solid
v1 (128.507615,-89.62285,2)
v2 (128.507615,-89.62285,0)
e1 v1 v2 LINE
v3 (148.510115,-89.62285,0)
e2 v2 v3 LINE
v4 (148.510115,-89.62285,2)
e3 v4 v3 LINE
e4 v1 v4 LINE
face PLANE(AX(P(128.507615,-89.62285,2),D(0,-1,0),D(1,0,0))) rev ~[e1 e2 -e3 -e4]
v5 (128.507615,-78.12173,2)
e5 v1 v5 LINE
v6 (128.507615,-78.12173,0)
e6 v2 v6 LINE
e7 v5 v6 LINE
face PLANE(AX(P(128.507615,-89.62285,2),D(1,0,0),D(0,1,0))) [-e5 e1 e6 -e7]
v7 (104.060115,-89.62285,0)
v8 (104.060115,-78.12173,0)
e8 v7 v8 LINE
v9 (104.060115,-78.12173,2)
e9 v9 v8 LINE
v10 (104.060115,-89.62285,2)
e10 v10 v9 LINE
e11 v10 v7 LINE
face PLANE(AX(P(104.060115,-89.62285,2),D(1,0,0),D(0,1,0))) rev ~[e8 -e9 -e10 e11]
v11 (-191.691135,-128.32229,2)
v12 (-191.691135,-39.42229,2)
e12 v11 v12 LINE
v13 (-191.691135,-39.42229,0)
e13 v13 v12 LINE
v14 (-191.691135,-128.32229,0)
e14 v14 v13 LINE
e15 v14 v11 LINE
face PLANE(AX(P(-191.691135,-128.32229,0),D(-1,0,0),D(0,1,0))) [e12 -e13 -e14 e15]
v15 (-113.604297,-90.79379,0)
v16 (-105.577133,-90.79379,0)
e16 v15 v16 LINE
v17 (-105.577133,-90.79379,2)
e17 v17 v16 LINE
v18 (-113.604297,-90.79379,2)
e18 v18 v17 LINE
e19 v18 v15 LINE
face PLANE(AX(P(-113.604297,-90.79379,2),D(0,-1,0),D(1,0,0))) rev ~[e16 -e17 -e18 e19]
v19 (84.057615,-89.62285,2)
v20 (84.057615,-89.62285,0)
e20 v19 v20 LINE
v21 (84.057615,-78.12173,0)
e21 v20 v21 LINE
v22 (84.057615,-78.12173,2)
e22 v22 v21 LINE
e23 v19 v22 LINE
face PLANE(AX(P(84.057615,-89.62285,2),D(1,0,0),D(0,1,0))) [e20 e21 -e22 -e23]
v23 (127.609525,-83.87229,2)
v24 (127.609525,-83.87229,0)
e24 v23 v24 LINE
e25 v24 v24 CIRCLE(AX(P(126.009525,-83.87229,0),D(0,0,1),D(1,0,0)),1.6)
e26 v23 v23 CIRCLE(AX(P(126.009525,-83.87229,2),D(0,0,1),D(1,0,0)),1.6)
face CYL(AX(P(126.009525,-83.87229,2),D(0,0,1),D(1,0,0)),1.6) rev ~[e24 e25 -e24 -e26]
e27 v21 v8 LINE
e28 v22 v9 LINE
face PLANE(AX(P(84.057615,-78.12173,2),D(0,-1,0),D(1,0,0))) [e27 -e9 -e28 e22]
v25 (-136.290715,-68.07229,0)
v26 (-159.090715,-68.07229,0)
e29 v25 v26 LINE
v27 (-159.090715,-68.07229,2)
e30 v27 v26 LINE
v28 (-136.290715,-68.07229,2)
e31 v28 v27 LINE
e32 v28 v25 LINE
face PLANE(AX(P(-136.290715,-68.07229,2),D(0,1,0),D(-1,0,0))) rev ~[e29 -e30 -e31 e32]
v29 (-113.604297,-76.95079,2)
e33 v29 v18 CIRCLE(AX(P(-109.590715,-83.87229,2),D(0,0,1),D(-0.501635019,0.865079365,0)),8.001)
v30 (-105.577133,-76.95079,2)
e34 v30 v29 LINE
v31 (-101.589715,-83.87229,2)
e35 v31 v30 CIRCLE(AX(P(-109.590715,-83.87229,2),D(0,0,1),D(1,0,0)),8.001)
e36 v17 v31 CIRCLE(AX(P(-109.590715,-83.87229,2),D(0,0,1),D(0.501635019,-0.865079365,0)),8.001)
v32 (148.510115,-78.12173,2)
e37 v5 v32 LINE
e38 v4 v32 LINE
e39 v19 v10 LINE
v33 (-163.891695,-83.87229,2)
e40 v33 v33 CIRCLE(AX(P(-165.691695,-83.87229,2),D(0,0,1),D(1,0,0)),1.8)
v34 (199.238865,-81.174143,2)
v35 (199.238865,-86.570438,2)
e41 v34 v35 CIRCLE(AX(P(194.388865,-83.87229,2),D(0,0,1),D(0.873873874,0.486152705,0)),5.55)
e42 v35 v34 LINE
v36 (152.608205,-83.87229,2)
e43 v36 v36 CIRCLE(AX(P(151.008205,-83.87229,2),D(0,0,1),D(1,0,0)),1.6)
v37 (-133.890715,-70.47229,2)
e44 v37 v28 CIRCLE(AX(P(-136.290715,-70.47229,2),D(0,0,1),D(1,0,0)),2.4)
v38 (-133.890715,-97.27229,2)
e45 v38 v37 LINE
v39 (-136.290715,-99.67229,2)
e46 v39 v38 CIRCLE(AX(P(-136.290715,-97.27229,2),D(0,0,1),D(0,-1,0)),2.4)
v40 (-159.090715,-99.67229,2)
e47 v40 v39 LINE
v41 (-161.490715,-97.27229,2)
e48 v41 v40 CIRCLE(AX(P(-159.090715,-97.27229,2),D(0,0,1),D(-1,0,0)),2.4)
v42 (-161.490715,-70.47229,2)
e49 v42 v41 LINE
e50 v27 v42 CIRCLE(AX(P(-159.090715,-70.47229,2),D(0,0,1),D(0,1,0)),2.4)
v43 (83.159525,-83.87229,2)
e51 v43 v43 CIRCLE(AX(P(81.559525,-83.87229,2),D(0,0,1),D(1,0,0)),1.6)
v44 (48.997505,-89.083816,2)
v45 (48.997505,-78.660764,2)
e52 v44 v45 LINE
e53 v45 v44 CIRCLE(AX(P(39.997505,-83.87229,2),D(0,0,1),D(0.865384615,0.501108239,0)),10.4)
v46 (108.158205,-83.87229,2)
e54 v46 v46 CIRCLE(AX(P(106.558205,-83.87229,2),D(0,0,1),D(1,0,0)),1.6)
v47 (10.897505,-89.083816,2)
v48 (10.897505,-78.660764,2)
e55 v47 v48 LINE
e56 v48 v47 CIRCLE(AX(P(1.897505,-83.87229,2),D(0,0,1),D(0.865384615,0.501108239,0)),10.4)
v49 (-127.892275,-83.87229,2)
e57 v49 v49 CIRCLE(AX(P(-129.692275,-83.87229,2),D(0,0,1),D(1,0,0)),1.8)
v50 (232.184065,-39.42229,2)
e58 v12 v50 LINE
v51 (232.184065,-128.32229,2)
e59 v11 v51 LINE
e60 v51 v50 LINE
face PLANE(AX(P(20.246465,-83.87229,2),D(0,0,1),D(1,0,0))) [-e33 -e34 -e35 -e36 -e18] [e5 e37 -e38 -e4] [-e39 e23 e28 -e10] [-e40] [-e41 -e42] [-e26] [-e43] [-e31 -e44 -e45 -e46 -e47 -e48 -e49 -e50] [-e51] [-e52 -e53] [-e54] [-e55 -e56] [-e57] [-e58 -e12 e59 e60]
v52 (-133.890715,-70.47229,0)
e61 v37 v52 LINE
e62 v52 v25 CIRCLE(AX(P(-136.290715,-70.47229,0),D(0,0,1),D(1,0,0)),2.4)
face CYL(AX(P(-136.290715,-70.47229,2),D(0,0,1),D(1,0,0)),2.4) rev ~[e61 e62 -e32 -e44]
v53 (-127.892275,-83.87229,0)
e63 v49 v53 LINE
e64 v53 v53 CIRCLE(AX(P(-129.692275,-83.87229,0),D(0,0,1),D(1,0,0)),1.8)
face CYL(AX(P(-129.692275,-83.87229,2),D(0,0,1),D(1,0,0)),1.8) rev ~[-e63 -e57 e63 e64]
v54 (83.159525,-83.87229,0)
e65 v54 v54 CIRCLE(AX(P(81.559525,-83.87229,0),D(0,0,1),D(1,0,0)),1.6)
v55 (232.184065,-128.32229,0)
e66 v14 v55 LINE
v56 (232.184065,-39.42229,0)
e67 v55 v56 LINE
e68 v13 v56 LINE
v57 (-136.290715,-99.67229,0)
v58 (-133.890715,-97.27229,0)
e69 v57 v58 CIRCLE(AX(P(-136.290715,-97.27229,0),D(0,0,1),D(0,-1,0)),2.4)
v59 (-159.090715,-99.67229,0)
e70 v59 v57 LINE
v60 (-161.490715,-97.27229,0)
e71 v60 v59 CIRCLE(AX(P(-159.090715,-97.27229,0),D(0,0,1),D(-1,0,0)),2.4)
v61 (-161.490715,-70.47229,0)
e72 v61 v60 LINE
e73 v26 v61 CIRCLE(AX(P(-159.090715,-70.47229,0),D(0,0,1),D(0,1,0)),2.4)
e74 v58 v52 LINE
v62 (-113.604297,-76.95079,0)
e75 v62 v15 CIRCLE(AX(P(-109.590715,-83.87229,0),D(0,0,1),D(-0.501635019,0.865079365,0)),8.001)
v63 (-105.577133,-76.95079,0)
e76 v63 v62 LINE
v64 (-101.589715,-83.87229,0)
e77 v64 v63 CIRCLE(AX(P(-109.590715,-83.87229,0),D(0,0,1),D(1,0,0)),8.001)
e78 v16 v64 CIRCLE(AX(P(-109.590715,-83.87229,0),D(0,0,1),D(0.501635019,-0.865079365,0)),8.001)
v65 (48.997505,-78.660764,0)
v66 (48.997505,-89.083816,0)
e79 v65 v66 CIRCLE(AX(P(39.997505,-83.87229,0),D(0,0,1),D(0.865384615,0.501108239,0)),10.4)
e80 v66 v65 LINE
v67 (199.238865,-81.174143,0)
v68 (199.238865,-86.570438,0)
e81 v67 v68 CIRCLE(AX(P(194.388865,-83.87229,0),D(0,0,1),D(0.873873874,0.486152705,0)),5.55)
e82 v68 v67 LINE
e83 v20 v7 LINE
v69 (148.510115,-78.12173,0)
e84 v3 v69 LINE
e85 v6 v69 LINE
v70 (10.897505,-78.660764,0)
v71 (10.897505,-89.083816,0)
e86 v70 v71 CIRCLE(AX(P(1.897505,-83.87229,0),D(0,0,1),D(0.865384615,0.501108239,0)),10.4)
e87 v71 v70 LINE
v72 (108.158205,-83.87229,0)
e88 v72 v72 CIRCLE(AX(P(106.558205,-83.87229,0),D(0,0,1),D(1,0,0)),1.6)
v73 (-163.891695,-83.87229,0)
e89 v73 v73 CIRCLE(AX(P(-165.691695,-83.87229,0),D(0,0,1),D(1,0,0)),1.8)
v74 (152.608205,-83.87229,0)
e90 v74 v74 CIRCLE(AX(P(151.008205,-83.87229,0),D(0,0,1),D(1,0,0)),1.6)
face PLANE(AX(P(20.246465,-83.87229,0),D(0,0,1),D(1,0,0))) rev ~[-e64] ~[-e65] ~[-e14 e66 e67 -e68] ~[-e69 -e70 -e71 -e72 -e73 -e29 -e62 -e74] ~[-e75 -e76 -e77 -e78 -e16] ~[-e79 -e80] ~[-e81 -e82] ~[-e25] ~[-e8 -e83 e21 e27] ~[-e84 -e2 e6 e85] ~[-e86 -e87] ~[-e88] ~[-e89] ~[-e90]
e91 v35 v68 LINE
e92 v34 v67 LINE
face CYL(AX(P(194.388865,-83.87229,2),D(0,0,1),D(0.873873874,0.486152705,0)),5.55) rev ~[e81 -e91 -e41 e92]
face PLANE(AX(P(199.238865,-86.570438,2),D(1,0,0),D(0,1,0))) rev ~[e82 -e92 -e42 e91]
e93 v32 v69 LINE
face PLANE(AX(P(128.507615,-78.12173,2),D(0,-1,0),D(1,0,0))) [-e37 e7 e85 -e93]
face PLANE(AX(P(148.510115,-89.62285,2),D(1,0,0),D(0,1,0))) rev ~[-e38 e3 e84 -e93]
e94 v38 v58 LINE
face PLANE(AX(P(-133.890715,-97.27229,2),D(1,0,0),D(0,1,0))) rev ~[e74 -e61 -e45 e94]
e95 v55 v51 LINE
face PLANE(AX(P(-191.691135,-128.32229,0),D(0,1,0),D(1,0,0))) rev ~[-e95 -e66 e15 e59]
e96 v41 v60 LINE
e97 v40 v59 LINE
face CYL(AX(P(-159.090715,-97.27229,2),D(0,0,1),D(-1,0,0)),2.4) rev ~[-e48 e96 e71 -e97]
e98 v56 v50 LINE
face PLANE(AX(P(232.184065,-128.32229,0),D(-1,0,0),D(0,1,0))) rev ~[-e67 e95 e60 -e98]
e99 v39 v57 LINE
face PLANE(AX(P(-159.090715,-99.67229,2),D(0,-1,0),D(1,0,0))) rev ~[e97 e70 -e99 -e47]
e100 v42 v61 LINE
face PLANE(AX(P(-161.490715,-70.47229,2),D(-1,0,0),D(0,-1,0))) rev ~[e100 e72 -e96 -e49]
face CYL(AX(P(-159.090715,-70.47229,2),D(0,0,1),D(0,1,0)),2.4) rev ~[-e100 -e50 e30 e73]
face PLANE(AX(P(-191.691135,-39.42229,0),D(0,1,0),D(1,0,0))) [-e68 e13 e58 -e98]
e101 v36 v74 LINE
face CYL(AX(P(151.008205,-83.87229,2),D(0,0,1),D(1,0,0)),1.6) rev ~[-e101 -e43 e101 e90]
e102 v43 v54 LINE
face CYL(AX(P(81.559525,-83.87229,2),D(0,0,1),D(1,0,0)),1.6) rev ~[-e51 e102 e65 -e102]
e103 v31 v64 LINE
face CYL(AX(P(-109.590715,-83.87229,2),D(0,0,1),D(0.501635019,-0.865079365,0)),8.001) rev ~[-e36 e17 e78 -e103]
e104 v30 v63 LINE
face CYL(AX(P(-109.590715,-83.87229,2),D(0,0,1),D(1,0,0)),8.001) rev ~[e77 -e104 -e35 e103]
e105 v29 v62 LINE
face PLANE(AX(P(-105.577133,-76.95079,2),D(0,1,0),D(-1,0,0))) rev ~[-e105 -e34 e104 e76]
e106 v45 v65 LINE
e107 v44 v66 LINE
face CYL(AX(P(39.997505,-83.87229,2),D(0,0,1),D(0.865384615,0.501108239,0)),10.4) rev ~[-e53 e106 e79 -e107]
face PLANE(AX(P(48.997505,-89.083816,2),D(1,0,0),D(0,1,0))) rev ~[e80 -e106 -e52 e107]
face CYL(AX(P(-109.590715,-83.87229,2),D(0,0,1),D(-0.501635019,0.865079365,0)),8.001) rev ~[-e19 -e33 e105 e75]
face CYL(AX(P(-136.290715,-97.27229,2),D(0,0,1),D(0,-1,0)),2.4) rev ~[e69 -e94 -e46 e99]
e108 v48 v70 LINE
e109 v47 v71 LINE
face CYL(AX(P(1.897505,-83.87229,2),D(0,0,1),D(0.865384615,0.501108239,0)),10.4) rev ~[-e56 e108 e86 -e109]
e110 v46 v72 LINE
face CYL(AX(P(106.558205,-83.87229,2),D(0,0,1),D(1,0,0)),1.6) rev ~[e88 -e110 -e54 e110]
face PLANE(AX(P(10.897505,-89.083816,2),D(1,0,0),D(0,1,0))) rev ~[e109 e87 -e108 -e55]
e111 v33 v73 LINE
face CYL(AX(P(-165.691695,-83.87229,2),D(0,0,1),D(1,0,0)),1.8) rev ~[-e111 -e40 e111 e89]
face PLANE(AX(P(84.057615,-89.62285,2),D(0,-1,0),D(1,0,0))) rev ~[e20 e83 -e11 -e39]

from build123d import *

# Parameters (mm, degrees)
F0_W     = 423.8752
F0_H     = 88.9
F1_DEPTH = 2
F2_R     = 1.8
F2_W     = 20.0025
F2_H     = 11.50112
F2_R_2   = 1.6
F3_DEPTH = 25.4


# Not quite as in the source:
# - a feature names something its author has since deleted; it is built from what else it names


with BuildPart() as f1:
    # F0 (on Top) → F1 (new body)
    with BuildSketch(Plane.XY):
        with Locations((20.2464647591, -83.8722900312)):
            Rectangle(F0_W, F0_H)
    extrude(amount=F1_DEPTH)

    # F2 (on face) → F3 (cut)
    with BuildSketch(Plane.XY.offset(2)):
        with Locations((-165.6916952409, -83.8722900312)):
            Circle(F2_R)
        with BuildLine():
            Line((-159.0907152409, -99.6722900312), (-136.2907152409, -99.6722900312))
            ThreePointArc((-136.2907152409, -99.6722900312), (-134.593658966, -98.9693463061), (-133.8907152409, -97.2722900312))
            Line((-133.8907152409, -97.2722900312), (-133.8907152409, -70.4722900312))
            ThreePointArc((-133.8907152409, -70.4722900312), (-134.593658966, -68.7752337564), (-136.2907152409, -68.0722900312))
            Line((-136.2907152409, -68.0722900312), (-159.0907152409, -68.0722900312))
            ThreePointArc((-159.0907152409, -68.0722900312), (-160.7877715157, -68.7752337564), (-161.4907152409, -70.4722900312))
            Line((-161.4907152409, -70.4722900312), (-161.4907152409, -97.2722900312))
            ThreePointArc((-161.4907152409, -97.2722900312), (-160.7877715157, -98.9693463061), (-159.0907152409, -99.6722900312))
        make_face()
        with Locations((-129.6922752409, -83.8722900312)):
            Circle(F2_R)
        with BuildLine():
            ThreePointArc((-105.5771334553, -90.7937900312), (-102.6578706275, -87.8662437824), (-101.5897152409, -83.8722900312))
            ThreePointArc((-101.5897152409, -83.8722900312), (-102.6578706275, -79.87833628), (-105.5771334553, -76.9507900312))
            Line((-105.5771334553, -76.9507900312), (-113.6042970265, -76.9507900312))
            ThreePointArc((-113.6042970265, -76.9507900312), (-117.5917152409, -83.8722900312), (-113.6042970265, -90.7937900312))
            Line((-113.6042970265, -90.7937900312), (-105.5771334553, -90.7937900312))
        make_face()
        with BuildLine():
            Line((10.8975047591, -89.0838157195), (10.8975047591, -78.6607643429))
            ThreePointArc((10.8975047591, -78.6607643429), (-8.5024952409, -83.8722900312), (10.8975047591, -89.0838157195))
        make_face()
        with BuildLine():
            Line((48.9975047591, -89.0838157195), (48.9975047591, -78.6607643429))
            ThreePointArc((48.9975047591, -78.6607643429), (29.5975047591, -83.8722900312), (48.9975047591, -89.0838157195))
        make_face()
        with BuildLine():
            Line((199.2388647591, -86.5704375439), (199.2388647591, -81.1741425186))
            ThreePointArc((199.2388647591, -81.1741425186), (188.8388647591, -83.8722900312), (199.2388647591, -86.5704375439))
        make_face()
        with Locations((94.0588647591, -83.8722900312)):
            Rectangle(F2_W, F2_H)
        with Locations((138.5088647591, -83.8722900312)):
            Rectangle(F2_W, F2_H)
        with Locations((106.5582047591, -83.8722900312)):
            Circle(F2_R_2)
        with Locations((81.5595247591, -83.8722900312)):
            Circle(F2_R_2)
        with Locations((126.0095247591, -83.8722900312)):
            Circle(F2_R_2)
        with Locations((151.0082047591, -83.8722900312)):
            Circle(F2_R_2)
    extrude(amount=-F3_DEPTH, mode=Mode.SUBTRACT)


solid = f1.part
